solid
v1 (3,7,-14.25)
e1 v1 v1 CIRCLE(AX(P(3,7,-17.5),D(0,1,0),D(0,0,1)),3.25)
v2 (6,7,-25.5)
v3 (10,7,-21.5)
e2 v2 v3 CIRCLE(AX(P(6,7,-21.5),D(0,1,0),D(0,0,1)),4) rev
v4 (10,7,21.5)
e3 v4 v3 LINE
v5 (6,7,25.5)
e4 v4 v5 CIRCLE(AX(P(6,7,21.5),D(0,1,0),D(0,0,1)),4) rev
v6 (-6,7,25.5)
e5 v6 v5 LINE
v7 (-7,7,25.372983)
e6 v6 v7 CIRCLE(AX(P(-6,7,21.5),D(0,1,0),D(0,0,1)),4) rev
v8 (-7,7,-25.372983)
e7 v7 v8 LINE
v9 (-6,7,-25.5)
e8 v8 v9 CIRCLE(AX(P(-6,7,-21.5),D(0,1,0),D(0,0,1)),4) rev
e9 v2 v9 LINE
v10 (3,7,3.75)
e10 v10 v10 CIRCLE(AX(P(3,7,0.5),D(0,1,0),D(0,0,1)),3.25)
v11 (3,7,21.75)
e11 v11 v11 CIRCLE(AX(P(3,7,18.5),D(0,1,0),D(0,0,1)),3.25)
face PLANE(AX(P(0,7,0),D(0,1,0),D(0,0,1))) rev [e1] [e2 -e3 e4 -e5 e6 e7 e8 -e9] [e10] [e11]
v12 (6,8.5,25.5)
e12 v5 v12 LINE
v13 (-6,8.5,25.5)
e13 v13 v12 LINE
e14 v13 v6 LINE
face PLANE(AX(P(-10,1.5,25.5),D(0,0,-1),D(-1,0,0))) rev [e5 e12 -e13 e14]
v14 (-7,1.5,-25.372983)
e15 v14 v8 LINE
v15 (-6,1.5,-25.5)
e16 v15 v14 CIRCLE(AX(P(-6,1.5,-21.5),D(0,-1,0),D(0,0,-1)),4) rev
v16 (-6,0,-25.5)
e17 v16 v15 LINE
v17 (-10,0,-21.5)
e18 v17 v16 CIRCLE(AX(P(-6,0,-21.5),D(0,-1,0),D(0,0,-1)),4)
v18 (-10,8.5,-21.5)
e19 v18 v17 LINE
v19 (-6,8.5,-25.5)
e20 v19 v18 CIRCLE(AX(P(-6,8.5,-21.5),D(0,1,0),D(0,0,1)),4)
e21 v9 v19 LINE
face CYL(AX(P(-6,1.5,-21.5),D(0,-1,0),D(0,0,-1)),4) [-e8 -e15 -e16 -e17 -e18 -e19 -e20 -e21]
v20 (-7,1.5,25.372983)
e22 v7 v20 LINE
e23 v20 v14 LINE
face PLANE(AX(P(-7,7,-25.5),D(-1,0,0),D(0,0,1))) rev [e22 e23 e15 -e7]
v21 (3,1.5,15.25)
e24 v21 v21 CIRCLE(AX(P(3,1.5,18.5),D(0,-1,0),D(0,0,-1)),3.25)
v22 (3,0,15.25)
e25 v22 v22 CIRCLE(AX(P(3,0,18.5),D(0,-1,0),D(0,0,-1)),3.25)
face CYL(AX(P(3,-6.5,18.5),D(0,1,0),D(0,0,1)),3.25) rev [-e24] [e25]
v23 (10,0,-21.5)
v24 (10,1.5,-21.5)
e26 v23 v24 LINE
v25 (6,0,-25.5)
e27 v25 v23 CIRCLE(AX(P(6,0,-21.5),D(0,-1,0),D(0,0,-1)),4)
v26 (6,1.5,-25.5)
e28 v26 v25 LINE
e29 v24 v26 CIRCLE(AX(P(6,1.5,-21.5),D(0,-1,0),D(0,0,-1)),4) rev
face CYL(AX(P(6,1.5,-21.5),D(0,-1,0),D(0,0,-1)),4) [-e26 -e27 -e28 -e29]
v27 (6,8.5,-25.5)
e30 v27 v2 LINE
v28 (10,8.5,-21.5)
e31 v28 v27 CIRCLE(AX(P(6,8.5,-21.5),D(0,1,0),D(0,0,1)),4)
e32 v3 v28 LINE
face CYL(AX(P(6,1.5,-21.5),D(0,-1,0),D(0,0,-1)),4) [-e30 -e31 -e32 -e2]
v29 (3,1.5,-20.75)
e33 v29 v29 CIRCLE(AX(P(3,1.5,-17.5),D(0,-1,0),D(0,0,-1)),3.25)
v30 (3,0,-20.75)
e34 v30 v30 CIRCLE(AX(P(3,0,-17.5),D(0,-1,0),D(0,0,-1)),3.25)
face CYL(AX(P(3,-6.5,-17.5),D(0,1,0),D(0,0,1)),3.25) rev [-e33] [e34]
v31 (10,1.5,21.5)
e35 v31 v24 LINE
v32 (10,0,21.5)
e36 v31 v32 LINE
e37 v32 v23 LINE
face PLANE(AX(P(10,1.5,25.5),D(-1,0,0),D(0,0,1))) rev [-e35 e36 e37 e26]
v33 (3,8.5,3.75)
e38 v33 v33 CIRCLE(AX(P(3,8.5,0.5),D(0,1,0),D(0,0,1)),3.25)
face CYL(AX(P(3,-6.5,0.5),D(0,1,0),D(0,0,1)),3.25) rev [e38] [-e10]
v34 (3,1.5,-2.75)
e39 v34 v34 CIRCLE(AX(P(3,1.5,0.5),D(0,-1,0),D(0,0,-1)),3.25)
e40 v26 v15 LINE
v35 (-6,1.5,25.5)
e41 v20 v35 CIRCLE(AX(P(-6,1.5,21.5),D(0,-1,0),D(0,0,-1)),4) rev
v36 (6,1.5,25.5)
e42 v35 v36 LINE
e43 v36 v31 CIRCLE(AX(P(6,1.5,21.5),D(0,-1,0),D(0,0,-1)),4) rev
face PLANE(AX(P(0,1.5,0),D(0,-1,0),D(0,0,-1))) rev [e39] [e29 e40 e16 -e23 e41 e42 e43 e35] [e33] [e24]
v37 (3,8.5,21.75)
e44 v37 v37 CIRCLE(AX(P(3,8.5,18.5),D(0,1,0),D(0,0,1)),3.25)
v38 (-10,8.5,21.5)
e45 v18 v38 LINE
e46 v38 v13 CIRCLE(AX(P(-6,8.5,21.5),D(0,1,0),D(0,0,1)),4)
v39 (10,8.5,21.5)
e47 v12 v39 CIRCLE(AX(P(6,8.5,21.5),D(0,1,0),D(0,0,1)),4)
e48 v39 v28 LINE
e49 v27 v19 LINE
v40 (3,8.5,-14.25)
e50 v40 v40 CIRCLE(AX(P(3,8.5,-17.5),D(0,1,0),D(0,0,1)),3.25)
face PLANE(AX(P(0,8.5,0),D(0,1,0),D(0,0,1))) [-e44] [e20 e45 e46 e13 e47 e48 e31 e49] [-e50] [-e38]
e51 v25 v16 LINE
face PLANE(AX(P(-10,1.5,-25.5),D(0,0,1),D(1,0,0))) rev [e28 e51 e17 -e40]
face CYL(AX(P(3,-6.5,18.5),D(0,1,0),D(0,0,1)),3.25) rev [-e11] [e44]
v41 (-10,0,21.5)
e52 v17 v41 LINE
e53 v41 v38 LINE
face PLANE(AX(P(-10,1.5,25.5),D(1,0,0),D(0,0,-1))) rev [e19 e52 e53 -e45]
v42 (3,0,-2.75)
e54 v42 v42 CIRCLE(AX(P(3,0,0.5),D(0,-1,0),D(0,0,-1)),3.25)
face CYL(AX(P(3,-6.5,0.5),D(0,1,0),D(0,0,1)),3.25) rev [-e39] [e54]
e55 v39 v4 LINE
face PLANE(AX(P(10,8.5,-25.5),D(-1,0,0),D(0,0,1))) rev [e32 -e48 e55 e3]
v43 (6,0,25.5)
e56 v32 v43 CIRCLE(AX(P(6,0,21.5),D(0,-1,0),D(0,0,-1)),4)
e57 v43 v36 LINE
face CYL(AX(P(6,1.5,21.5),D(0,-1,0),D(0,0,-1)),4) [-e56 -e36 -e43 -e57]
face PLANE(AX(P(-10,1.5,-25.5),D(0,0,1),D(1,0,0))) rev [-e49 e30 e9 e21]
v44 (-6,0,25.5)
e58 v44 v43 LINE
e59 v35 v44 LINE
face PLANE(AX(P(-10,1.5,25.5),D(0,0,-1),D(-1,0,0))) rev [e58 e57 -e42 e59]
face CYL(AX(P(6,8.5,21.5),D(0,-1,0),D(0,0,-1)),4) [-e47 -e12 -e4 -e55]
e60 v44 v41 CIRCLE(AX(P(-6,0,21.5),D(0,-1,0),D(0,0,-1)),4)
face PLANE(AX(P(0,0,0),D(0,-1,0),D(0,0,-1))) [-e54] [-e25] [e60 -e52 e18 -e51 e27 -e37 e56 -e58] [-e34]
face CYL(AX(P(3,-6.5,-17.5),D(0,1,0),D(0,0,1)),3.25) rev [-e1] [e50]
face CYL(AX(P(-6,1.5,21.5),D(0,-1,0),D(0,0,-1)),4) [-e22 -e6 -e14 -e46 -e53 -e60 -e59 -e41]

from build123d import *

# Parameters (mm, degrees)
SKETCH1_W           = 20
SKETCH1_H           = 51
BOSS_EXTRUDE1_DEPTH = 1.5
SKETCH2_W           = 3
SKETCH2_H           = 51
BOSS_EXTRUDE2_DEPTH = 5.5
SKETCH3_W           = 20
SKETCH3_H           = 51
BOSS_EXTRUDE3_DEPTH = 1.5
SKETCH4_R           = 3.25
CUT_EXTRUDE1_DEPTH  = 15
FILLET1_R           = 4


with BuildPart() as part:
    # Sketch1 → Boss-Extrude1 (new body)
    with BuildSketch(Plane(origin=(0, 0, 0), x_dir=(1, 0, 0), z_dir=(0, 1, 0))):
        Rectangle(SKETCH1_W, SKETCH1_H)
    extrude(amount=BOSS_EXTRUDE1_DEPTH)

    # Sketch2 → Boss-Extrude2 (add)
    with BuildSketch(Plane(origin=(0, 1.5, 0), x_dir=(1, 0, 0), z_dir=(0, 1, 0))):
        with Locations((-8.5, 0)):
            Rectangle(SKETCH2_W, SKETCH2_H)
    extrude(amount=BOSS_EXTRUDE2_DEPTH)

    # Sketch3 → Boss-Extrude3 (add)
    with BuildSketch(Plane(origin=(0, 7, 0), x_dir=(1, 0, 0), z_dir=(0, 1, 0))):
        Rectangle(SKETCH3_W, SKETCH3_H)
    extrude(amount=BOSS_EXTRUDE3_DEPTH)

    # Sketch4 → Cut-Extrude1 (cut)
    with BuildSketch(Plane(origin=(0, 8.5, 0), x_dir=(1, 0, 0), z_dir=(0, 1, 0))):
        with Locations(Location((3, 17.5, 0), (0, 0, 270))):
            Circle(SKETCH4_R)
        with Locations(Location((3, -0.5, 0), (0, 0, 270))):
            Circle(SKETCH4_R)
        with Locations(Location((3, -18.5, 0), (0, 0, 270))):
            Circle(SKETCH4_R)
    extrude(amount=-CUT_EXTRUDE1_DEPTH, mode=Mode.SUBTRACT)

    # Fillet1
    # the kernel refuses this fillet: 4 mm, written as the material it takes off along each edge
    with BuildSketch(Plane(origin=(-10, 18.5, 25.5), x_dir=(1, 0, 0), z_dir=(0, -1, 0)), Plane(origin=(-10, 18.5, -25.5), x_dir=(0, 0, 1), z_dir=(0, -1, 0))) as fillet1_piece_1:
        with BuildLine():
            CenterArc((FILLET1_R, -FILLET1_R), FILLET1_R, 90, 90)
            Line((0, -FILLET1_R), (0, 0))
            Line((0, 0), (FILLET1_R, 0))
        make_face()
    extrude(amount=28.5, mode=Mode.SUBTRACT)
    with BuildSketch(Plane(origin=(10, -10, 25.5), x_dir=(-1, 0, 0), z_dir=(0, 1, 0)), Plane(origin=(10, -3, 25.5), x_dir=(-1, 0, 0), z_dir=(0, 1, 0)), Plane(origin=(10, -10, -25.5), x_dir=(0, 0, 1), z_dir=(0, 1, 0)), Plane(origin=(10, -3, -25.5), x_dir=(0, 0, 1), z_dir=(0, 1, 0))) as fillet1_piece_2:
        with BuildLine():
            CenterArc((FILLET1_R, -FILLET1_R), FILLET1_R, 90, 90)
            Line((0, -FILLET1_R), (0, 0))
            Line((0, 0), (FILLET1_R, 0))
        make_face()
    extrude(amount=21.5, mode=Mode.SUBTRACT)


solid = part.part
